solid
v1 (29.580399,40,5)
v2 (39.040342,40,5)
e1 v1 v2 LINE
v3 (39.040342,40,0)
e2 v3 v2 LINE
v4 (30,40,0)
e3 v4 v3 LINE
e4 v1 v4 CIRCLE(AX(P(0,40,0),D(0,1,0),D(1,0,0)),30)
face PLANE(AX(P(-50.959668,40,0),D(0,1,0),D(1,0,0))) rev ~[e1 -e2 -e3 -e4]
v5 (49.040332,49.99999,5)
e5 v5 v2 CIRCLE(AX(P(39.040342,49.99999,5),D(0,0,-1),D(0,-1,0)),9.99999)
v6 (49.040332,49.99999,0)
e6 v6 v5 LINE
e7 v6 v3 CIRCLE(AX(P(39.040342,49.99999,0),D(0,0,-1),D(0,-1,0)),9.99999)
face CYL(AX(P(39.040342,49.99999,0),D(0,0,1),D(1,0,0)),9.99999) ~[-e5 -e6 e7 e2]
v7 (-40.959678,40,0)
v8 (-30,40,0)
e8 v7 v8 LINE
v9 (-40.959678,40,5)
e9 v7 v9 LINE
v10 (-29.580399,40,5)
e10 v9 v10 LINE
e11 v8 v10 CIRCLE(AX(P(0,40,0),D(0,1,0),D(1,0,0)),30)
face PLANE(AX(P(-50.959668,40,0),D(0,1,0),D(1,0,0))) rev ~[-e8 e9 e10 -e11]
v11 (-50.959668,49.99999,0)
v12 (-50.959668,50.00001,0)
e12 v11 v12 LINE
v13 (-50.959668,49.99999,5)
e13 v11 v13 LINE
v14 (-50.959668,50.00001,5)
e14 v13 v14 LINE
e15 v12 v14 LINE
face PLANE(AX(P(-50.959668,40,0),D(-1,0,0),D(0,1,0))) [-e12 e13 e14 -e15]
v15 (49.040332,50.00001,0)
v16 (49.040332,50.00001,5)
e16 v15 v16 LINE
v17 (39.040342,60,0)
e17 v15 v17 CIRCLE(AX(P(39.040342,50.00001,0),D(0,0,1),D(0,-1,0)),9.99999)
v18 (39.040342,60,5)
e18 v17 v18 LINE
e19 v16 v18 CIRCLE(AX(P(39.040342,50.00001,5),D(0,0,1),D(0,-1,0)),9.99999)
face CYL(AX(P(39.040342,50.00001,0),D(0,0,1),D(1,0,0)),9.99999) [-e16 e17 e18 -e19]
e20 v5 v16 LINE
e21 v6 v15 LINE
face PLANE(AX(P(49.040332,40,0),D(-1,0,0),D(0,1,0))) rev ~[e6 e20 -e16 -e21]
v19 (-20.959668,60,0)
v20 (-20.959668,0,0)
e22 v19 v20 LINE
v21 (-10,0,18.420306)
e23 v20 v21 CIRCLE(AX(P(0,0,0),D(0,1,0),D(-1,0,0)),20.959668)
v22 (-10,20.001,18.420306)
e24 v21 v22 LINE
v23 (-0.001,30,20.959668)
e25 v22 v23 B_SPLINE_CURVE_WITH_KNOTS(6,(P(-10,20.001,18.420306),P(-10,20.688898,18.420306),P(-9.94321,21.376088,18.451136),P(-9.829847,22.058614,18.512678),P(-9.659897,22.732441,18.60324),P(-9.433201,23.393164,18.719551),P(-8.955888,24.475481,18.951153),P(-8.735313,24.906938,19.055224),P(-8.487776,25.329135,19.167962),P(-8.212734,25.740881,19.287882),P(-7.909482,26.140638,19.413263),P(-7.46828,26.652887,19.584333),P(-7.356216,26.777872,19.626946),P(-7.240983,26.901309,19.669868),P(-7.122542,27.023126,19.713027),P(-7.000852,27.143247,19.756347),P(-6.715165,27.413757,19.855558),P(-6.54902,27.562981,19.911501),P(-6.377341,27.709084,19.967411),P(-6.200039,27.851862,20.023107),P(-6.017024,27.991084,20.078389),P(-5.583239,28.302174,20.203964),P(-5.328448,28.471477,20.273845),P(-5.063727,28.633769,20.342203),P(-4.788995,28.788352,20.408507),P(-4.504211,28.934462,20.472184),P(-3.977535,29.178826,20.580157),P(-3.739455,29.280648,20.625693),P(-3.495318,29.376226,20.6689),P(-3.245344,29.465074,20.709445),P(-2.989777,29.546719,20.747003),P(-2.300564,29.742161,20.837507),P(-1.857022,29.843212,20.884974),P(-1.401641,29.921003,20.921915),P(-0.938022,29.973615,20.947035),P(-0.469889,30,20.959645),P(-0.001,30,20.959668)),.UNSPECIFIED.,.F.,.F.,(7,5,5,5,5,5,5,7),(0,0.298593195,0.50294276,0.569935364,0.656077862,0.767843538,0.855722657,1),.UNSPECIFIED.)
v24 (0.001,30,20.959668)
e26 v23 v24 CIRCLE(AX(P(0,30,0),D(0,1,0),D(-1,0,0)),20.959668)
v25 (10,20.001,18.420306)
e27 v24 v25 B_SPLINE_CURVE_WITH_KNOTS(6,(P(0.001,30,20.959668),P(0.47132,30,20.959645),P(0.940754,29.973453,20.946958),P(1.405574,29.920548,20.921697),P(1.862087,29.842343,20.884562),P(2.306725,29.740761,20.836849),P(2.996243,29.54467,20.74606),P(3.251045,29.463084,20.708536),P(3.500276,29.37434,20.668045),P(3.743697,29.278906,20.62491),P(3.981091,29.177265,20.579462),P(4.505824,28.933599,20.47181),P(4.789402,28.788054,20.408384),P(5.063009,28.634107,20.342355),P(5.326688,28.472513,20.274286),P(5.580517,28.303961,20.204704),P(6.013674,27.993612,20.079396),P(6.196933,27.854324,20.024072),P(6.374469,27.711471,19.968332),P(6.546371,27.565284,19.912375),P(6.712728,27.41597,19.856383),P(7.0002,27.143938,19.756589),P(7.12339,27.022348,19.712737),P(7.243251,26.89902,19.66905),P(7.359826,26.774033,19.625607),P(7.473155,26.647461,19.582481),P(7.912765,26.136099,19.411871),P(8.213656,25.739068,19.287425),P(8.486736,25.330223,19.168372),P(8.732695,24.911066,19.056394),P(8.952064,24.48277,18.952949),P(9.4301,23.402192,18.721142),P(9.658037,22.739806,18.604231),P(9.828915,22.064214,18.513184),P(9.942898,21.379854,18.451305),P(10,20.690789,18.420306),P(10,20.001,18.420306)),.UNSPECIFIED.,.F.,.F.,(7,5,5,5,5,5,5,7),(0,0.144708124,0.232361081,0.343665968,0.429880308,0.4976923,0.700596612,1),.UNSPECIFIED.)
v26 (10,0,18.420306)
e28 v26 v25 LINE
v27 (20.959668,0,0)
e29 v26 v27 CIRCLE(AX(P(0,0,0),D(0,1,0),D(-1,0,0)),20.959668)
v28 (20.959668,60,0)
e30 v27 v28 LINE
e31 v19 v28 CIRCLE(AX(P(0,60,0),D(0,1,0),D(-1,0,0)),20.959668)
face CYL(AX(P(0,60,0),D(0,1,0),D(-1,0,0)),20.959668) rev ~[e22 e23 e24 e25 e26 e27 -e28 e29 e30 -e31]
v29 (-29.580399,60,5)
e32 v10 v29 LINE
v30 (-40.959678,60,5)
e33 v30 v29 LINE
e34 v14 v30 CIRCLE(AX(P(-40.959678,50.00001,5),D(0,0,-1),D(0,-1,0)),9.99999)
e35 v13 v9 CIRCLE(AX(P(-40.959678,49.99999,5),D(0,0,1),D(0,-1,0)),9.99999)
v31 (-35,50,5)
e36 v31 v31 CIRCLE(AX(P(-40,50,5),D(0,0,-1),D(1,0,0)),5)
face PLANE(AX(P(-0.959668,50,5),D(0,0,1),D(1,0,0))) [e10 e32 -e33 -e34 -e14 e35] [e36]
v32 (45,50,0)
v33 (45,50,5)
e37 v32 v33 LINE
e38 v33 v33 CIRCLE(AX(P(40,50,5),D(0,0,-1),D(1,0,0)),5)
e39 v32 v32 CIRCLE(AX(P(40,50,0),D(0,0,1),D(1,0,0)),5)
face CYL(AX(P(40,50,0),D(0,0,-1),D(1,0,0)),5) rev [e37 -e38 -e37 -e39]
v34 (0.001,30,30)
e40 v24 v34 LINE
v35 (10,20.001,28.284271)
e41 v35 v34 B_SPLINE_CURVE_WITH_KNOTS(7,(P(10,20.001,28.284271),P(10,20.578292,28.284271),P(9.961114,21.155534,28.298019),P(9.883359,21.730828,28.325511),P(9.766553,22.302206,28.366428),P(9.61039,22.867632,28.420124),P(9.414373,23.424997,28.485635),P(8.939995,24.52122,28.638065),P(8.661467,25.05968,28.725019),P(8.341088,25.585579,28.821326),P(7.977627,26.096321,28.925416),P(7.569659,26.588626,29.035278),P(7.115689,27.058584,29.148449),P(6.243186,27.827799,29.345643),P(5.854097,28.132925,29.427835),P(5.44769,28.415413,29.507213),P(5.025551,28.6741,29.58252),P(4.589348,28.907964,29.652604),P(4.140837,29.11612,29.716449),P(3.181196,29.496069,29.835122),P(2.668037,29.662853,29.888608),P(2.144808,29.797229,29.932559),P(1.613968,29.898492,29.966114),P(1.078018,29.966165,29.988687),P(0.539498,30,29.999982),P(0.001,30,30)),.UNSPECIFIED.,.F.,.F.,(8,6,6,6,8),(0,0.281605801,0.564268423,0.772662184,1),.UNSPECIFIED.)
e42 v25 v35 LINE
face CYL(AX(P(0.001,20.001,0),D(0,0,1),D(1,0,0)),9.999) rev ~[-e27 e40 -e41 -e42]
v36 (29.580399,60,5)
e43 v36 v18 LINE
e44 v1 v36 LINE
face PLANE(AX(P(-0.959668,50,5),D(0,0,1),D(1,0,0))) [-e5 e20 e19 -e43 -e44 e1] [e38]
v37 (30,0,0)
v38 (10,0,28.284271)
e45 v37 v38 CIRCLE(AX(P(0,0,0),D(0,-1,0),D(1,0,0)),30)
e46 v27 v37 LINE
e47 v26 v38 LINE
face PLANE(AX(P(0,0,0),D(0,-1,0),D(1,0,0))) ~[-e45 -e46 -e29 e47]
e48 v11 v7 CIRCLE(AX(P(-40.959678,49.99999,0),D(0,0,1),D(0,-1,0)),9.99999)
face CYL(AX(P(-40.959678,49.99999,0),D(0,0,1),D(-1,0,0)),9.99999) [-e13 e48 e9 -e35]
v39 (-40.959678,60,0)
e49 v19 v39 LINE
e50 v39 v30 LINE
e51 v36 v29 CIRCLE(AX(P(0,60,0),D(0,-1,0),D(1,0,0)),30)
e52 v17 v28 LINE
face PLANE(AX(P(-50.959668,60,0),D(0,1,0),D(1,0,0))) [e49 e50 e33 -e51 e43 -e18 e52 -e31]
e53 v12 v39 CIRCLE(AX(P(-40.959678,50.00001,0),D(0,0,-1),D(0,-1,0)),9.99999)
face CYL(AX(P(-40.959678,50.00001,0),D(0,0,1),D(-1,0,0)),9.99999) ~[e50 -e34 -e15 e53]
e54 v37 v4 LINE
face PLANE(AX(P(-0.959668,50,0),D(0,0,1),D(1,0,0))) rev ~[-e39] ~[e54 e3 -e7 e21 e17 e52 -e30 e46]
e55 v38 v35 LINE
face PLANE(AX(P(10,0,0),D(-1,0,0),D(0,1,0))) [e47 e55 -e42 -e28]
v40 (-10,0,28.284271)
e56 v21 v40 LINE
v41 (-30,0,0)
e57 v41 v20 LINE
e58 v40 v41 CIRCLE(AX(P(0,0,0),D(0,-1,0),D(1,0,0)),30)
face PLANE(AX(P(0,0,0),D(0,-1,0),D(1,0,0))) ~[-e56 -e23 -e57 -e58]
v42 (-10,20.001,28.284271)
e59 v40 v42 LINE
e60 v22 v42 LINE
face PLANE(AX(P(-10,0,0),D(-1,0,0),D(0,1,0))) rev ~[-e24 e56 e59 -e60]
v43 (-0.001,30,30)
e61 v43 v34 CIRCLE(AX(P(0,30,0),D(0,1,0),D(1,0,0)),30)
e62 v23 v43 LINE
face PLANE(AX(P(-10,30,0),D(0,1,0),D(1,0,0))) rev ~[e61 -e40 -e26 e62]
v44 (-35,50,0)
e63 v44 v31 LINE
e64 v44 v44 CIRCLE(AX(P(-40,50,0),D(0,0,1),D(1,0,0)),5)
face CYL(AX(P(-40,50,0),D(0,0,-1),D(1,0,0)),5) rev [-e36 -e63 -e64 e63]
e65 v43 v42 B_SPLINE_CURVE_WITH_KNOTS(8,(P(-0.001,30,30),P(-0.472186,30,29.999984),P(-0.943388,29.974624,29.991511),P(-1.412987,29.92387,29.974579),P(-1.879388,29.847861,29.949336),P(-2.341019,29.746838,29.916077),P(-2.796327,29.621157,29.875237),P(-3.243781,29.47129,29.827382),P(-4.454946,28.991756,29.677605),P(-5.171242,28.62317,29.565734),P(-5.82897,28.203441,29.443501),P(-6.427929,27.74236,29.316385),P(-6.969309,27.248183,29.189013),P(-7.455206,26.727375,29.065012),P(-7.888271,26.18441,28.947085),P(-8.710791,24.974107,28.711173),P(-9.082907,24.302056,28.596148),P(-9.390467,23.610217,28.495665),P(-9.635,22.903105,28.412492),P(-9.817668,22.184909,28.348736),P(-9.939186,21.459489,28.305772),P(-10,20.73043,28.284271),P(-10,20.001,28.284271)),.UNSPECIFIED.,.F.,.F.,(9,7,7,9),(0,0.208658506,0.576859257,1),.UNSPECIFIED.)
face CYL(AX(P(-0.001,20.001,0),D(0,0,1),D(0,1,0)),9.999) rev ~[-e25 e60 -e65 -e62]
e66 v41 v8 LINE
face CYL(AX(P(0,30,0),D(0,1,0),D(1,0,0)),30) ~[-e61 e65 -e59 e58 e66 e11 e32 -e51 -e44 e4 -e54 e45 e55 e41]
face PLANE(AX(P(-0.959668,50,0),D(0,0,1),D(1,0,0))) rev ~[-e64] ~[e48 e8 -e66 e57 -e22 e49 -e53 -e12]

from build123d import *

# Parameters (mm, degrees)
F1_W      = 30
F1_H      = 60
F2_ANGLE  = 180
F3_W      = 100
F3_H      = 20
F4_DEPTH  = 5
F5_R      = 9.99999
F6_R      = 5
F7_DEPTH  = 30.001
F8_W      = 20
F8_H      = 30
F9_DEPTH  = 30.001
F10_R     = 9.999
F11_R     = 20.9596675634
F12_DEPTH = 60.0010001


# Not quite as in the source:
# - a fillet or chamfer is up to 0.001 mm smaller than in the source, because OpenCascade refuses the exact size


with BuildPart() as f2:
    # F1 (on Top) → F2 (revolve)
    with BuildSketch(Plane.XY):
        with Locations((15, 30)):
            Rectangle(F1_W, F1_H)
    revolve(axis=Axis((0, 30, 0), (0, -1, 0)), revolution_arc=F2_ANGLE)

    # F3 (on Top) → F4 (join)
    with BuildSketch(Plane.XY):
        with Locations((-0.9596675634, 50)):
            Rectangle(F3_W, F3_H)
    extrude(amount=F4_DEPTH)

    # F5 (radius 10 in the source; OpenCascade refuses exactly that, so slightly less here)
    f5_edges = [f2.edges().sort_by_distance(p)[0] for p in [
        (-50.959668, 60, 2.5),
        (-50.959668, 40, 2.5),
        (49.040332, 40, 2.5),
        (49.040332, 60, 2.5),
    ]]
    fillet(f5_edges, radius=F5_R)

    # F6 (on Top) → F7 (cut, through all)
    with BuildSketch(Plane.XY):
        with Locations((40, 50)):
            Circle(F6_R)
        with Locations((-40, 50)):
            Circle(F6_R)
    extrude(amount=F7_DEPTH, mode=Mode.SUBTRACT)

    # F8 (on Top) → F9 (cut, through all)
    with BuildSketch(Plane.XY):
        with Locations((0, 15)):
            Rectangle(F8_W, F8_H)
    extrude(amount=F9_DEPTH, mode=Mode.SUBTRACT)

    # F10 (radius 10 in the source; OpenCascade refuses exactly that, so slightly less here)
    f10_edges = [f2.edges().sort_by_distance(p)[0] for p in [
        (-10, 30, 14.142136),
        (10, 30, 14.142136),
    ]]
    fillet(f10_edges, radius=F10_R)

    # F11 (on face) → F12 (cut, through all)
    with BuildSketch(Plane(origin=(0, 60, 0), x_dir=(-1, 0, 0), z_dir=(0, 1, 0))):
        Circle(F11_R)
    extrude(amount=-F12_DEPTH, mode=Mode.SUBTRACT)


solid = f2.part
